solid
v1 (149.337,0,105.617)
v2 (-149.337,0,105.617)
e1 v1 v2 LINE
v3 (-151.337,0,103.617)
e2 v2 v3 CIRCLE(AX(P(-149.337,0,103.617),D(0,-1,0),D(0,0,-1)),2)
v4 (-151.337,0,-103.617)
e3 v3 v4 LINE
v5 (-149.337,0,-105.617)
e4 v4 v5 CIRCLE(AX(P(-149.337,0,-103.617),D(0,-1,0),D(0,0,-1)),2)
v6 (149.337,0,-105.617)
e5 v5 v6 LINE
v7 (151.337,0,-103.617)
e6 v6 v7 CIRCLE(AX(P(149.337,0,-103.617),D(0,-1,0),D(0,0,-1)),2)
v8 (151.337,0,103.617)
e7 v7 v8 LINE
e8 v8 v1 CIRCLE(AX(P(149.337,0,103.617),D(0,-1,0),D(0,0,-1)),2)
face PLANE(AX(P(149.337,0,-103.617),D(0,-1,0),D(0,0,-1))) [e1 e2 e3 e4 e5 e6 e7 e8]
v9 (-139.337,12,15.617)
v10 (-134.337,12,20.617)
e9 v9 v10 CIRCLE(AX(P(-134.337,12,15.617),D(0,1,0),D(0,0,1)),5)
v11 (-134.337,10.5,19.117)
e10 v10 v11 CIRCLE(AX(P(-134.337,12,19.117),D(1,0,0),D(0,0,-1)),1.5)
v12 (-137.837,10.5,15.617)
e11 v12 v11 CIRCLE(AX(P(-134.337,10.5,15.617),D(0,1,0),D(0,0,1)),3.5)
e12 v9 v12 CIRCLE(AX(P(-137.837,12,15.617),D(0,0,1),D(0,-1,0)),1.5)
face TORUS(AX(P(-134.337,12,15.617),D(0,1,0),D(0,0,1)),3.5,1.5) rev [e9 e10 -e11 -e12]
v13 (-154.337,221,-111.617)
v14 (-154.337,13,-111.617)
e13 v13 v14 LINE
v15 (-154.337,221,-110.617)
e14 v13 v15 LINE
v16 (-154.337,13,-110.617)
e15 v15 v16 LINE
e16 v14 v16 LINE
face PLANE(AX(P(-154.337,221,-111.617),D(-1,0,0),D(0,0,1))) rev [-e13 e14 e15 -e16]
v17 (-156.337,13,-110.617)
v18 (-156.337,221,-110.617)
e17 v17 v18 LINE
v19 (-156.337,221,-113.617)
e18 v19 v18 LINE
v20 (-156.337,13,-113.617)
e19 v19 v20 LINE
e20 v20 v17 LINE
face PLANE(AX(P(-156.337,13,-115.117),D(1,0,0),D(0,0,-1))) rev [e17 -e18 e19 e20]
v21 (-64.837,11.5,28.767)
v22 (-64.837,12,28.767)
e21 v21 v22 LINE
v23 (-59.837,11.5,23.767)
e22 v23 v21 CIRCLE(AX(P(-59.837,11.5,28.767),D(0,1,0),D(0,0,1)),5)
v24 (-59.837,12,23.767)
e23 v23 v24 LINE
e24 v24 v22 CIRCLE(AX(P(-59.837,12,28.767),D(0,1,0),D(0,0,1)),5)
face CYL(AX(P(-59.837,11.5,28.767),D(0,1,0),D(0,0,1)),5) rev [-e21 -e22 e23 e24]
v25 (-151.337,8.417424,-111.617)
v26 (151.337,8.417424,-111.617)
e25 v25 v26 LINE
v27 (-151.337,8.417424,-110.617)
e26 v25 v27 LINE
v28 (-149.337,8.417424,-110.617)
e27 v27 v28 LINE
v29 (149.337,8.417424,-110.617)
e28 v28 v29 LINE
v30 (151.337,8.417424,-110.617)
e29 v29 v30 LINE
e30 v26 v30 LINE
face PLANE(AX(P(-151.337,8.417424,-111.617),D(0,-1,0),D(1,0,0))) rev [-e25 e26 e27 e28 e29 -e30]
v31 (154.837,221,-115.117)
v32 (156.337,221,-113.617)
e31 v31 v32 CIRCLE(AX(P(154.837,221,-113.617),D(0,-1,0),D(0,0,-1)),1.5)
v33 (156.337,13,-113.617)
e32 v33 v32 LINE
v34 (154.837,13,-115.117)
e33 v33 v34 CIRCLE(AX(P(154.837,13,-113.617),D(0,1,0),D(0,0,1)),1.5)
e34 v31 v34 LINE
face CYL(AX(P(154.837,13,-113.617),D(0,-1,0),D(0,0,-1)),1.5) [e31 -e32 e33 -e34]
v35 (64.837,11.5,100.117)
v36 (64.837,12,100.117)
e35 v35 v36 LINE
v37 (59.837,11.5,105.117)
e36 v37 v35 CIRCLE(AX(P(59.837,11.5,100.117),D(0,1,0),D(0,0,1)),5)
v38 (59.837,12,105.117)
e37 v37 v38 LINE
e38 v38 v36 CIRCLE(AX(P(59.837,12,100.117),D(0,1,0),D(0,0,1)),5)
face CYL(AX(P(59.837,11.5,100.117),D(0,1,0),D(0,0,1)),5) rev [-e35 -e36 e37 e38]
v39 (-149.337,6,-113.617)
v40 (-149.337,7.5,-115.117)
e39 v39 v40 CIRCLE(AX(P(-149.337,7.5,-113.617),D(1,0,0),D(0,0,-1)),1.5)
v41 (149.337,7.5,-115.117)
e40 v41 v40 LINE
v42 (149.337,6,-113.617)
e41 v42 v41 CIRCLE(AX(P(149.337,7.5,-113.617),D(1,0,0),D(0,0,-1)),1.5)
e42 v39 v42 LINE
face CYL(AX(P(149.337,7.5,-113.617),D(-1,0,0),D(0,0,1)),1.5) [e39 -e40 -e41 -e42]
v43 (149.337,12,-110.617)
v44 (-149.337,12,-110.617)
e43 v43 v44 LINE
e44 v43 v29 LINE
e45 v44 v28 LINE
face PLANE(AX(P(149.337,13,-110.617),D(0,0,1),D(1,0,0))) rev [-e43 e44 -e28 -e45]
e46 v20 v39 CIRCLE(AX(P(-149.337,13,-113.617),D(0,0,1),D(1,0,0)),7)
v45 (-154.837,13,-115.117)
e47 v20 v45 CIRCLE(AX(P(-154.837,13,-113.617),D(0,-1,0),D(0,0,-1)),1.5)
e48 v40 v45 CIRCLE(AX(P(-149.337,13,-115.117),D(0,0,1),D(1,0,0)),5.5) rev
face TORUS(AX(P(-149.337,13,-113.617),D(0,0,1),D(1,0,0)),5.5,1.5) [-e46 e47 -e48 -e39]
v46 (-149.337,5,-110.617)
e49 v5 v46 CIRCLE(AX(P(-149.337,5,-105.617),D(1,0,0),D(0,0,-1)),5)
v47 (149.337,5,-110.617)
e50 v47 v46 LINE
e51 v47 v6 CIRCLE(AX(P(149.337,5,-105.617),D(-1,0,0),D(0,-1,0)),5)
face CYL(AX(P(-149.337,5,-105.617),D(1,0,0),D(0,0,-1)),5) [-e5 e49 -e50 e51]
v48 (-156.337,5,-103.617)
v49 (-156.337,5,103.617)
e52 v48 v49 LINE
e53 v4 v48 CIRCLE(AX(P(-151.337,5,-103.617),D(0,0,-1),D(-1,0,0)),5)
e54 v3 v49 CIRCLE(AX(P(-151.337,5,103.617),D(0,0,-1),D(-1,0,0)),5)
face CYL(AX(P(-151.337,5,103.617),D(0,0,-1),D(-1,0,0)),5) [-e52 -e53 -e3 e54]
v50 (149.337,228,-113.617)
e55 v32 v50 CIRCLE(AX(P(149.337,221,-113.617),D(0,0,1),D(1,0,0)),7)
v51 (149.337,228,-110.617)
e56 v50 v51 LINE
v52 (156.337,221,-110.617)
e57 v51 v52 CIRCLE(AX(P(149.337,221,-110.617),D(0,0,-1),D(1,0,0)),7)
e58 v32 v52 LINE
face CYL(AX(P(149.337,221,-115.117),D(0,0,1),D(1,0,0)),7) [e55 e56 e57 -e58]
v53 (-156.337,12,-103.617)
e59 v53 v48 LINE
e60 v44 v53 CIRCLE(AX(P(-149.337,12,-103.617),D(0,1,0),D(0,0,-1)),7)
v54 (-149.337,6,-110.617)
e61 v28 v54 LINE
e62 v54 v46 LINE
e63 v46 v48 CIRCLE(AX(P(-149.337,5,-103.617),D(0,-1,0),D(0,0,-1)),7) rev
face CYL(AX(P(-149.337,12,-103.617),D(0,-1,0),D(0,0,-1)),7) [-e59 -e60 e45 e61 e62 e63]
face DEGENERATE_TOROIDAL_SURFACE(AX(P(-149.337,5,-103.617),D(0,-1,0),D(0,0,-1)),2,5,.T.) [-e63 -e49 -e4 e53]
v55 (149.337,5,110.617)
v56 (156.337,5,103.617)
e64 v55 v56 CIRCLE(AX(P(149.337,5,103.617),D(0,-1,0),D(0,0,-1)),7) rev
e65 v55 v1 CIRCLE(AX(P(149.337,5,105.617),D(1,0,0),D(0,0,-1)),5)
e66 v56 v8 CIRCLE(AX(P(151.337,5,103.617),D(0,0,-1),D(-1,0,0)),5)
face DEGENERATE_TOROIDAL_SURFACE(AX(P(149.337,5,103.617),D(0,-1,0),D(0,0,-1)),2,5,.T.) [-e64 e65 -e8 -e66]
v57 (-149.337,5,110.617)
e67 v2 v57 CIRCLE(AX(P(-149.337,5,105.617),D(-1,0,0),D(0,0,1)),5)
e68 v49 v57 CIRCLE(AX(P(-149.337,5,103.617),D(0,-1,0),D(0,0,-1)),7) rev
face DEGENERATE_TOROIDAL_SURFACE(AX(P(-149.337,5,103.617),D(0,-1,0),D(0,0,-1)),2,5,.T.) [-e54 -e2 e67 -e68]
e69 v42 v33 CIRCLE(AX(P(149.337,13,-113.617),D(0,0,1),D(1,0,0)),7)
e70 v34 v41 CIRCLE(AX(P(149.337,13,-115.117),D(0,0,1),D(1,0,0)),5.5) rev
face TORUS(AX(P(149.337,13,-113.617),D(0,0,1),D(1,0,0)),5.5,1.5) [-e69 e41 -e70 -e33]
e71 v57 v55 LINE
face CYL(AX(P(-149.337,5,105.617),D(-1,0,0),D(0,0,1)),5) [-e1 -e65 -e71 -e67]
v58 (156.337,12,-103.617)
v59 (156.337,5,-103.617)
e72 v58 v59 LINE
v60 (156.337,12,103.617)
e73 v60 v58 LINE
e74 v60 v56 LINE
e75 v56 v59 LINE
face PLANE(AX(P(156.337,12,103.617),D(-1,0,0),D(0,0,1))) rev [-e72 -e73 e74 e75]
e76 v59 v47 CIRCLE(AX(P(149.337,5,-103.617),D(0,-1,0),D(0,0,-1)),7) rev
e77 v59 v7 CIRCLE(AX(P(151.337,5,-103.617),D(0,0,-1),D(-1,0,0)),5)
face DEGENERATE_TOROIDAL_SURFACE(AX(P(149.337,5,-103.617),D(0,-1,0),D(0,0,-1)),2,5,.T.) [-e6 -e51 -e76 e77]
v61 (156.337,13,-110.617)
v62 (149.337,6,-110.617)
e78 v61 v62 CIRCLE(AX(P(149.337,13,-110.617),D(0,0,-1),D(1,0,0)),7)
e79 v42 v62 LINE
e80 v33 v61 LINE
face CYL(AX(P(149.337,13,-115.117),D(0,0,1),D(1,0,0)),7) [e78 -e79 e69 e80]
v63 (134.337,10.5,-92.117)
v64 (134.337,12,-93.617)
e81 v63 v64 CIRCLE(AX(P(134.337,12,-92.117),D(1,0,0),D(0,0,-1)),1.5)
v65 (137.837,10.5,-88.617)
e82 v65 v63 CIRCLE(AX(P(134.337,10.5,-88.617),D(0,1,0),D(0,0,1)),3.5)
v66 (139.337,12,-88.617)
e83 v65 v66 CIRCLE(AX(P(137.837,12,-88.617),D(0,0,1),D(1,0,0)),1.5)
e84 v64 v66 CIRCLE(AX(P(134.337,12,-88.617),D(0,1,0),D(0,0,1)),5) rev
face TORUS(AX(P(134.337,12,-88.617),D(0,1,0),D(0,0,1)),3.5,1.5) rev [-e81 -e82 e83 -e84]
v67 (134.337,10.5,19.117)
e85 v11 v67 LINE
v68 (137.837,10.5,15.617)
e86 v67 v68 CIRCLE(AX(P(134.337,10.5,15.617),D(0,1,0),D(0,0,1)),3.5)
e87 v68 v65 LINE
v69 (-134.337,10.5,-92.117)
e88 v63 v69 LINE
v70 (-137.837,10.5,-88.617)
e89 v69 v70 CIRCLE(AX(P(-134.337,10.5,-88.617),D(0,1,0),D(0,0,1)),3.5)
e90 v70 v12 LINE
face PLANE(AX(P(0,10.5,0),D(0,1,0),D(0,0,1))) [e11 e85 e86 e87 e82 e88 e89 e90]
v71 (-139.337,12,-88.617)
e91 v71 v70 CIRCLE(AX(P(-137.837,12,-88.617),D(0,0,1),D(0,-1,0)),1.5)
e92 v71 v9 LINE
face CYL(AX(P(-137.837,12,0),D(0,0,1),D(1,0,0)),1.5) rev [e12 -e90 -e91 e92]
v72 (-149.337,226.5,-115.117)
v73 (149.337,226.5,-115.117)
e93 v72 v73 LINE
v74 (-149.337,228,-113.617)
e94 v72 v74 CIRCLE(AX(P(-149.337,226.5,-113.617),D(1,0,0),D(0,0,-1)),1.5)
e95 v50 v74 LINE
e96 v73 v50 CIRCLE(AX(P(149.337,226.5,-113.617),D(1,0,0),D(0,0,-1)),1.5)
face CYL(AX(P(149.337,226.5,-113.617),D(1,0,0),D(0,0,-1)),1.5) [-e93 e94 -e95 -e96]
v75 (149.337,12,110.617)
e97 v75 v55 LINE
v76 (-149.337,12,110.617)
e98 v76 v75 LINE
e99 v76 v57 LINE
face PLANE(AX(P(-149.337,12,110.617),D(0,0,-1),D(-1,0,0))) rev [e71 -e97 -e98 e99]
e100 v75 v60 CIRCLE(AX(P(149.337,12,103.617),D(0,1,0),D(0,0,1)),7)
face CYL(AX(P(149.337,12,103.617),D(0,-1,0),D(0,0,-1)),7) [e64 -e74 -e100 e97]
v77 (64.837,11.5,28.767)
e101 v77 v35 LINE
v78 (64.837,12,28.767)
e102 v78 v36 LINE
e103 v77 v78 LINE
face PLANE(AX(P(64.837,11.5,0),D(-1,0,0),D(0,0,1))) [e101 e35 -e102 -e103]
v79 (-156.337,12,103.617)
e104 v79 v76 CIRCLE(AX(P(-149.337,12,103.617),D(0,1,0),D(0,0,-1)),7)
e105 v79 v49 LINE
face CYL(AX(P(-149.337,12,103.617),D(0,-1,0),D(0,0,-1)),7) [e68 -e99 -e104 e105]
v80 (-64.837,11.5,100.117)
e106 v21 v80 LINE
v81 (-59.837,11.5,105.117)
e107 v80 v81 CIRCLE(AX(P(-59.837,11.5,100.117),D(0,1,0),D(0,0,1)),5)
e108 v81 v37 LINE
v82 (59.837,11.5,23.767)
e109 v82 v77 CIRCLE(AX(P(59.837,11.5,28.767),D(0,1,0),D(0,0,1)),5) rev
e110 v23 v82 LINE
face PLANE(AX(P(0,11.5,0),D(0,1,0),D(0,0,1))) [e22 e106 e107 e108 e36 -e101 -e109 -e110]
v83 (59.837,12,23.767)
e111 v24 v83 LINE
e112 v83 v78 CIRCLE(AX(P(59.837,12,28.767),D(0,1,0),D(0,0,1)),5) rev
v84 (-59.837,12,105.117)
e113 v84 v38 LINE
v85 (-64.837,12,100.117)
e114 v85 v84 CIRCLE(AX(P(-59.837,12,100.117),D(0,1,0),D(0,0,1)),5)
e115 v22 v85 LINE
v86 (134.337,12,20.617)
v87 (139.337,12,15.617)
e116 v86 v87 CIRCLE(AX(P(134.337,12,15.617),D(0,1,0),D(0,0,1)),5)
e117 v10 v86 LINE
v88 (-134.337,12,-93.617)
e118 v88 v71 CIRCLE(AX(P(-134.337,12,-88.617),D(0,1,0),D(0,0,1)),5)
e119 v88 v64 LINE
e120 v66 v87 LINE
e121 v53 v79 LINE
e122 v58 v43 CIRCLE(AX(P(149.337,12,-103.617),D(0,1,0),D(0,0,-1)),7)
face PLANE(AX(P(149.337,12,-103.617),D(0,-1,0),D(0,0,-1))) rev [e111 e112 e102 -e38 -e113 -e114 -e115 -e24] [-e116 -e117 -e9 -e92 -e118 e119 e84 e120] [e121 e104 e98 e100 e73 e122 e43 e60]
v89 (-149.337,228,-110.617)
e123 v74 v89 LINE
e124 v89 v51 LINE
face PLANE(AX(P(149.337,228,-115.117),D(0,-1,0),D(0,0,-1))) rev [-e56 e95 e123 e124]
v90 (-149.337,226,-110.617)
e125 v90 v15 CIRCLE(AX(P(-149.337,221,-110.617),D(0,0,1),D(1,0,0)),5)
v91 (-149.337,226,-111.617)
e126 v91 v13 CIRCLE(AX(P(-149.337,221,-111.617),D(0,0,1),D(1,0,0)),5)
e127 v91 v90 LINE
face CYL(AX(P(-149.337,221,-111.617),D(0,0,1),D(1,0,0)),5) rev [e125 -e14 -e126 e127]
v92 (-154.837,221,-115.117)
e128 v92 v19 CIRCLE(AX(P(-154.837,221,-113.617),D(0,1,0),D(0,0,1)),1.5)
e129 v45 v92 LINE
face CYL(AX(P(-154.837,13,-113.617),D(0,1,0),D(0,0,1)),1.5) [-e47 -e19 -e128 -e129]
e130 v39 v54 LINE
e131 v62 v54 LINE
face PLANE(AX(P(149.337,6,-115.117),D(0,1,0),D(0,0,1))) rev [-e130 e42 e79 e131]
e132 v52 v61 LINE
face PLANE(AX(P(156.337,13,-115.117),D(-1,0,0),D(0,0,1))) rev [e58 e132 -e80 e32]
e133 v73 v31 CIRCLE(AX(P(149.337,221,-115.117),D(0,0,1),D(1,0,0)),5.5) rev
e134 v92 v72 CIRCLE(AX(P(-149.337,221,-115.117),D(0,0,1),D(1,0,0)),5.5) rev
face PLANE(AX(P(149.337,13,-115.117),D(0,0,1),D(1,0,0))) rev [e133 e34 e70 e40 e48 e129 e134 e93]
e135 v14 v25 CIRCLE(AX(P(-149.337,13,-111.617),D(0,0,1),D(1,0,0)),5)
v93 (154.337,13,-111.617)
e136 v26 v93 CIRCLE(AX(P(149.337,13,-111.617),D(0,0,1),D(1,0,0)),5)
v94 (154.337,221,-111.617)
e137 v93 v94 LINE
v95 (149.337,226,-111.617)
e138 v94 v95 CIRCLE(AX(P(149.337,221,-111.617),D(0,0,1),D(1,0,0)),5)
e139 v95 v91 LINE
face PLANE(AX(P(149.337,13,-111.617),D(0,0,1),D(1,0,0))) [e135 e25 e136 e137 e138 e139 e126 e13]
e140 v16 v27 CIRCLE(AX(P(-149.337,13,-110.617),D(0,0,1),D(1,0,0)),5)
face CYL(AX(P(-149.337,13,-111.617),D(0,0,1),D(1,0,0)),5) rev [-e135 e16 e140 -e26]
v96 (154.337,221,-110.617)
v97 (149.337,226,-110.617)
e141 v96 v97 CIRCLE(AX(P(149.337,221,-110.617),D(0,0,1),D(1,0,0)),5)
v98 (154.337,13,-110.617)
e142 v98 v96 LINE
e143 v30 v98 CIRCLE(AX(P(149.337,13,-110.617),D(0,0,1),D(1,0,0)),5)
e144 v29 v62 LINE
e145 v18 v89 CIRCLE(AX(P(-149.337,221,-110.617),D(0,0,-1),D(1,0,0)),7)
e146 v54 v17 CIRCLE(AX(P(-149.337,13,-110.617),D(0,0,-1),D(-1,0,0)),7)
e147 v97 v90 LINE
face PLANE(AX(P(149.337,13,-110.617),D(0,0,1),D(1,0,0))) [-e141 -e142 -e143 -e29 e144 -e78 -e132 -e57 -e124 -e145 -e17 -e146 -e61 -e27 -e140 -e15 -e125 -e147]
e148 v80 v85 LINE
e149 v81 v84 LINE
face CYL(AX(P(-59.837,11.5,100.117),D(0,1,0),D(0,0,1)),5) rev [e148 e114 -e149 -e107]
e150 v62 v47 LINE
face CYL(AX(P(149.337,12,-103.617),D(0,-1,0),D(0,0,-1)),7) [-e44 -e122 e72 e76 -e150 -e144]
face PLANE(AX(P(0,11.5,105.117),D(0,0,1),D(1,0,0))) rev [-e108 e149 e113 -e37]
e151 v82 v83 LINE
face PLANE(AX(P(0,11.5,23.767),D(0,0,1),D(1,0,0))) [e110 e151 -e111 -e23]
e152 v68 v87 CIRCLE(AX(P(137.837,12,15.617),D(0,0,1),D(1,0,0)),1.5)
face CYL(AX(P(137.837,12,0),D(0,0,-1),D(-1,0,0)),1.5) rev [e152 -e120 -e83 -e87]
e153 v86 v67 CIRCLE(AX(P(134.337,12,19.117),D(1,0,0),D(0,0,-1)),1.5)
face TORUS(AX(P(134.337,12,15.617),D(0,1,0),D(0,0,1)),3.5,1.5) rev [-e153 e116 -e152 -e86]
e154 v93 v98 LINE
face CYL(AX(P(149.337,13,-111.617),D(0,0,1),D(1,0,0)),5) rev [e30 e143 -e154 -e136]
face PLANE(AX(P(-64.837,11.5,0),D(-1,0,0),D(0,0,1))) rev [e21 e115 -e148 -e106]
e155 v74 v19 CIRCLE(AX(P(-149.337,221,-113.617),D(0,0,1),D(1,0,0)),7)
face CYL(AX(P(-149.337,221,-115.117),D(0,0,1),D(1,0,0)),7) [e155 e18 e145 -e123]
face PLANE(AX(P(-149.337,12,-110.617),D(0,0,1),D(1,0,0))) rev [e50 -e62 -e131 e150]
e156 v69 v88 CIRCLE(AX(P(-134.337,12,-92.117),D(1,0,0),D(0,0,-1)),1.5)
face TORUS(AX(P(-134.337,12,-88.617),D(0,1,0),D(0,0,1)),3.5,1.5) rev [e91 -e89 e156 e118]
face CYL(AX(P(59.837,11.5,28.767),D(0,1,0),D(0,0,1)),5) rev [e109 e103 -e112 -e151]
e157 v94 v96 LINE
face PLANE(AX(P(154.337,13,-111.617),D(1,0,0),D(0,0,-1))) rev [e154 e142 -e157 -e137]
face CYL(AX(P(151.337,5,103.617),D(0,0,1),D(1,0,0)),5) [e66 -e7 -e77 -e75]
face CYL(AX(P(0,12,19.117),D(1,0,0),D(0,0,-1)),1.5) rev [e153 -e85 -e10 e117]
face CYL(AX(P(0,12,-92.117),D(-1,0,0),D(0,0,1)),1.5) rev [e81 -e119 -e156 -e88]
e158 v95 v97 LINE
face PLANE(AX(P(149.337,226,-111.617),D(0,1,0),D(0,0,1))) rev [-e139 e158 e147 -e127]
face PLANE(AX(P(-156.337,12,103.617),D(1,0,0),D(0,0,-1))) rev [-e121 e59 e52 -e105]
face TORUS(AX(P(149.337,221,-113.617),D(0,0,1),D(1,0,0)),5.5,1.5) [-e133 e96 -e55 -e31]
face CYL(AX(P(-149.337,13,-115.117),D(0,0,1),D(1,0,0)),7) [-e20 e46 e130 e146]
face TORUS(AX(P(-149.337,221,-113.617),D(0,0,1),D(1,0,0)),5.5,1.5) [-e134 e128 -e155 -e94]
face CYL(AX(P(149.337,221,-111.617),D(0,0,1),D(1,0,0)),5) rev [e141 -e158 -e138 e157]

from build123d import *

# Parameters (mm, degrees)
BOSS_EXTRUDE1_DEPTH = 12
BOSS_EXTRUDE2_DEPTH = 4.5
FILLET1_R           = 5
FILLET2_R           = 1.5
CUT_EXTRUDE1_DEPTH  = 1
CUT_EXTRUDE2_DEPTH  = 1.5
CUT_EXTRUDE3_DEPTH  = 0.5
FILLET3_R           = 1.5


with BuildPart() as part:
    # Sketch1 → Boss-Extrude1 (new body)
    with BuildSketch(Plane(origin=(0, 0, 0), x_dir=(1, 0, 0), z_dir=(0, 1, 0))):
        with BuildLine():
            Line((-149.337, -110.617), (149.337, -110.617))
            ThreePointArc((149.337, -110.617), (154.286747468, -108.566747468), (156.337, -103.617))
            Line((156.337, -103.617), (156.337, 103.617))
            ThreePointArc((156.337, 103.617), (154.286747468, 108.566747468), (149.337, 110.617))
            Line((149.337, 110.617), (-149.337, 110.617))
            ThreePointArc((-149.337, 110.617), (-154.286747468, 108.566747468), (-156.337, 103.617))
            Line((-156.337, 103.617), (-156.337, -103.617))
            ThreePointArc((-156.337, -103.617), (-154.286747468, -108.566747468), (-149.337, -110.617))
        make_face()
    extrude(amount=BOSS_EXTRUDE1_DEPTH)

    # Sketch2 → Boss-Extrude2 (add)
    with BuildSketch(Plane(origin=(0, 0, -110.617), x_dir=(-1, 0, 0), z_dir=(0, 0, -1))):
        with BuildLine():
            Line((-149.337, 6), (149.337, 6))
            ThreePointArc((149.337, 6), (154.286747468, 8.050252532), (156.337, 13))
            Line((156.337, 13), (156.337, 221))
            ThreePointArc((156.337, 221), (154.286747468, 225.949747468), (149.337, 228))
            Line((149.337, 228), (-149.337, 228))
            ThreePointArc((-149.337, 228), (-154.286747468, 225.949747468), (-156.337, 221))
            Line((-156.337, 221), (-156.337, 13))
            ThreePointArc((-156.337, 13), (-154.286747468, 8.050252532), (-149.337, 6))
        make_face()
    extrude(amount=BOSS_EXTRUDE2_DEPTH)

    # Fillet1
    fillet1_edges = [part.edges().sort_by_distance(p)[0] for p in [
        (-156.337, 0, 0),
        (-154.286747468, 0, -108.566747468),
        (0, 0, -110.617),
        (154.286747468, 0, -108.566747468),
        (156.337, 0, 0),
        (154.286747468, 0, 108.566747468),
        (0, 0, 110.617),
        (-154.286747468, 0, 108.566747468),
    ]]
    fillet(fillet1_edges, radius=FILLET1_R)

    # Fillet2
    fillet2_edges = [part.edges().sort_by_distance(p)[0] for p in [
        (154.286747468, 8.050252532, -115.117),
        (0, 6, -115.117),
        (-154.286747468, 8.050252532, -115.117),
        (-156.337, 117, -115.117),
        (-154.286747468, 225.949747468, -115.117),
        (0, 228, -115.117),
        (154.286747468, 225.949747468, -115.117),
        (156.337, 117, -115.117),
    ]]
    fillet(fillet2_edges, radius=FILLET2_R)

    # Sketch3 → Cut-Extrude1 (cut)
    with BuildSketch(Plane.XY.offset(-110.617)):
        with BuildLine():
            Line((-151.337, 8.417424305), (151.337, 8.417424305))
            ThreePointArc((151.337, 8.417424305), (153.520300133, 10.261387212), (154.337, 13))
            Line((154.337, 13), (154.337, 221))
            ThreePointArc((154.337, 221), (152.872533906, 224.535533906), (149.337, 226))
            Line((149.337, 226), (-149.337, 226))
            ThreePointArc((-149.337, 226), (-152.872533906, 224.535533906), (-154.337, 221))
            Line((-154.337, 221), (-154.337, 13))
            ThreePointArc((-154.337, 13), (-153.520300133, 10.261387212), (-151.337, 8.417424305))
        make_face()
    extrude(amount=-CUT_EXTRUDE1_DEPTH, mode=Mode.SUBTRACT)

    # Sketch4 → Cut-Extrude2 (cut)
    with BuildSketch(Plane(origin=(0, 12, 0), x_dir=(1, 0, 0), z_dir=(0, 1, 0))):
        with BuildLine():
            Line((-134.337, -20.617), (134.337, -20.617))
            ThreePointArc((134.337, -20.617), (137.872533906, -19.152533906), (139.337, -15.617))
            Line((139.337, -15.617), (139.337, 88.617))
            ThreePointArc((139.337, 88.617), (137.872533906, 92.152533906), (134.337, 93.617))
            Line((134.337, 93.617), (-134.337, 93.617))
            ThreePointArc((-134.337, 93.617), (-137.872533906, 92.152533906), (-139.337, 88.617))
            Line((-139.337, 88.617), (-139.337, -15.617))
            ThreePointArc((-139.337, -15.617), (-137.872533906, -19.152533906), (-134.337, -20.617))
        make_face()
    extrude(amount=-CUT_EXTRUDE2_DEPTH, mode=Mode.SUBTRACT)

    # Sketch4<3> → Cut-Extrude3 (cut)
    with BuildSketch(Plane(origin=(0, 12, 0), x_dir=(1, 0, 0), z_dir=(0, 1, 0))):
        with BuildLine():
            Line((-59.837, -23.767), (59.837, -23.767))
            ThreePointArc((59.837, -23.767), (63.372533906, -25.231466094), (64.837, -28.767))
            Line((64.837, -28.767), (64.837, -100.117))
            ThreePointArc((64.837, -100.117), (63.372533906, -103.652533906), (59.837, -105.117))
            Line((59.837, -105.117), (-59.837, -105.117))
            ThreePointArc((-59.837, -105.117), (-63.372533906, -103.652533906), (-64.837, -100.117))
            Line((-64.837, -100.117), (-64.837, -28.767))
            ThreePointArc((-64.837, -28.767), (-63.372533906, -25.231466094), (-59.837, -23.767))
        make_face()
    extrude(amount=-CUT_EXTRUDE3_DEPTH, mode=Mode.SUBTRACT)

    # Fillet3
    fillet3_edges = [part.edges().sort_by_distance(p)[0] for p in [
        (-137.872533906, 10.5, -92.152533906),
        (-139.337, 10.5, -36.5),
        (-137.872533906, 10.5, 19.152533906),
        (0, 10.5, 20.617),
        (137.872533906, 10.5, 19.152533906),
        (139.337, 10.5, -36.5),
        (137.872533906, 10.5, -92.152533906),
        (0, 10.5, -93.617),
    ]]
    fillet(fillet3_edges, radius=FILLET3_R - 0.0001)  # a hair under: the kernel refuses the full size


solid = part.part
